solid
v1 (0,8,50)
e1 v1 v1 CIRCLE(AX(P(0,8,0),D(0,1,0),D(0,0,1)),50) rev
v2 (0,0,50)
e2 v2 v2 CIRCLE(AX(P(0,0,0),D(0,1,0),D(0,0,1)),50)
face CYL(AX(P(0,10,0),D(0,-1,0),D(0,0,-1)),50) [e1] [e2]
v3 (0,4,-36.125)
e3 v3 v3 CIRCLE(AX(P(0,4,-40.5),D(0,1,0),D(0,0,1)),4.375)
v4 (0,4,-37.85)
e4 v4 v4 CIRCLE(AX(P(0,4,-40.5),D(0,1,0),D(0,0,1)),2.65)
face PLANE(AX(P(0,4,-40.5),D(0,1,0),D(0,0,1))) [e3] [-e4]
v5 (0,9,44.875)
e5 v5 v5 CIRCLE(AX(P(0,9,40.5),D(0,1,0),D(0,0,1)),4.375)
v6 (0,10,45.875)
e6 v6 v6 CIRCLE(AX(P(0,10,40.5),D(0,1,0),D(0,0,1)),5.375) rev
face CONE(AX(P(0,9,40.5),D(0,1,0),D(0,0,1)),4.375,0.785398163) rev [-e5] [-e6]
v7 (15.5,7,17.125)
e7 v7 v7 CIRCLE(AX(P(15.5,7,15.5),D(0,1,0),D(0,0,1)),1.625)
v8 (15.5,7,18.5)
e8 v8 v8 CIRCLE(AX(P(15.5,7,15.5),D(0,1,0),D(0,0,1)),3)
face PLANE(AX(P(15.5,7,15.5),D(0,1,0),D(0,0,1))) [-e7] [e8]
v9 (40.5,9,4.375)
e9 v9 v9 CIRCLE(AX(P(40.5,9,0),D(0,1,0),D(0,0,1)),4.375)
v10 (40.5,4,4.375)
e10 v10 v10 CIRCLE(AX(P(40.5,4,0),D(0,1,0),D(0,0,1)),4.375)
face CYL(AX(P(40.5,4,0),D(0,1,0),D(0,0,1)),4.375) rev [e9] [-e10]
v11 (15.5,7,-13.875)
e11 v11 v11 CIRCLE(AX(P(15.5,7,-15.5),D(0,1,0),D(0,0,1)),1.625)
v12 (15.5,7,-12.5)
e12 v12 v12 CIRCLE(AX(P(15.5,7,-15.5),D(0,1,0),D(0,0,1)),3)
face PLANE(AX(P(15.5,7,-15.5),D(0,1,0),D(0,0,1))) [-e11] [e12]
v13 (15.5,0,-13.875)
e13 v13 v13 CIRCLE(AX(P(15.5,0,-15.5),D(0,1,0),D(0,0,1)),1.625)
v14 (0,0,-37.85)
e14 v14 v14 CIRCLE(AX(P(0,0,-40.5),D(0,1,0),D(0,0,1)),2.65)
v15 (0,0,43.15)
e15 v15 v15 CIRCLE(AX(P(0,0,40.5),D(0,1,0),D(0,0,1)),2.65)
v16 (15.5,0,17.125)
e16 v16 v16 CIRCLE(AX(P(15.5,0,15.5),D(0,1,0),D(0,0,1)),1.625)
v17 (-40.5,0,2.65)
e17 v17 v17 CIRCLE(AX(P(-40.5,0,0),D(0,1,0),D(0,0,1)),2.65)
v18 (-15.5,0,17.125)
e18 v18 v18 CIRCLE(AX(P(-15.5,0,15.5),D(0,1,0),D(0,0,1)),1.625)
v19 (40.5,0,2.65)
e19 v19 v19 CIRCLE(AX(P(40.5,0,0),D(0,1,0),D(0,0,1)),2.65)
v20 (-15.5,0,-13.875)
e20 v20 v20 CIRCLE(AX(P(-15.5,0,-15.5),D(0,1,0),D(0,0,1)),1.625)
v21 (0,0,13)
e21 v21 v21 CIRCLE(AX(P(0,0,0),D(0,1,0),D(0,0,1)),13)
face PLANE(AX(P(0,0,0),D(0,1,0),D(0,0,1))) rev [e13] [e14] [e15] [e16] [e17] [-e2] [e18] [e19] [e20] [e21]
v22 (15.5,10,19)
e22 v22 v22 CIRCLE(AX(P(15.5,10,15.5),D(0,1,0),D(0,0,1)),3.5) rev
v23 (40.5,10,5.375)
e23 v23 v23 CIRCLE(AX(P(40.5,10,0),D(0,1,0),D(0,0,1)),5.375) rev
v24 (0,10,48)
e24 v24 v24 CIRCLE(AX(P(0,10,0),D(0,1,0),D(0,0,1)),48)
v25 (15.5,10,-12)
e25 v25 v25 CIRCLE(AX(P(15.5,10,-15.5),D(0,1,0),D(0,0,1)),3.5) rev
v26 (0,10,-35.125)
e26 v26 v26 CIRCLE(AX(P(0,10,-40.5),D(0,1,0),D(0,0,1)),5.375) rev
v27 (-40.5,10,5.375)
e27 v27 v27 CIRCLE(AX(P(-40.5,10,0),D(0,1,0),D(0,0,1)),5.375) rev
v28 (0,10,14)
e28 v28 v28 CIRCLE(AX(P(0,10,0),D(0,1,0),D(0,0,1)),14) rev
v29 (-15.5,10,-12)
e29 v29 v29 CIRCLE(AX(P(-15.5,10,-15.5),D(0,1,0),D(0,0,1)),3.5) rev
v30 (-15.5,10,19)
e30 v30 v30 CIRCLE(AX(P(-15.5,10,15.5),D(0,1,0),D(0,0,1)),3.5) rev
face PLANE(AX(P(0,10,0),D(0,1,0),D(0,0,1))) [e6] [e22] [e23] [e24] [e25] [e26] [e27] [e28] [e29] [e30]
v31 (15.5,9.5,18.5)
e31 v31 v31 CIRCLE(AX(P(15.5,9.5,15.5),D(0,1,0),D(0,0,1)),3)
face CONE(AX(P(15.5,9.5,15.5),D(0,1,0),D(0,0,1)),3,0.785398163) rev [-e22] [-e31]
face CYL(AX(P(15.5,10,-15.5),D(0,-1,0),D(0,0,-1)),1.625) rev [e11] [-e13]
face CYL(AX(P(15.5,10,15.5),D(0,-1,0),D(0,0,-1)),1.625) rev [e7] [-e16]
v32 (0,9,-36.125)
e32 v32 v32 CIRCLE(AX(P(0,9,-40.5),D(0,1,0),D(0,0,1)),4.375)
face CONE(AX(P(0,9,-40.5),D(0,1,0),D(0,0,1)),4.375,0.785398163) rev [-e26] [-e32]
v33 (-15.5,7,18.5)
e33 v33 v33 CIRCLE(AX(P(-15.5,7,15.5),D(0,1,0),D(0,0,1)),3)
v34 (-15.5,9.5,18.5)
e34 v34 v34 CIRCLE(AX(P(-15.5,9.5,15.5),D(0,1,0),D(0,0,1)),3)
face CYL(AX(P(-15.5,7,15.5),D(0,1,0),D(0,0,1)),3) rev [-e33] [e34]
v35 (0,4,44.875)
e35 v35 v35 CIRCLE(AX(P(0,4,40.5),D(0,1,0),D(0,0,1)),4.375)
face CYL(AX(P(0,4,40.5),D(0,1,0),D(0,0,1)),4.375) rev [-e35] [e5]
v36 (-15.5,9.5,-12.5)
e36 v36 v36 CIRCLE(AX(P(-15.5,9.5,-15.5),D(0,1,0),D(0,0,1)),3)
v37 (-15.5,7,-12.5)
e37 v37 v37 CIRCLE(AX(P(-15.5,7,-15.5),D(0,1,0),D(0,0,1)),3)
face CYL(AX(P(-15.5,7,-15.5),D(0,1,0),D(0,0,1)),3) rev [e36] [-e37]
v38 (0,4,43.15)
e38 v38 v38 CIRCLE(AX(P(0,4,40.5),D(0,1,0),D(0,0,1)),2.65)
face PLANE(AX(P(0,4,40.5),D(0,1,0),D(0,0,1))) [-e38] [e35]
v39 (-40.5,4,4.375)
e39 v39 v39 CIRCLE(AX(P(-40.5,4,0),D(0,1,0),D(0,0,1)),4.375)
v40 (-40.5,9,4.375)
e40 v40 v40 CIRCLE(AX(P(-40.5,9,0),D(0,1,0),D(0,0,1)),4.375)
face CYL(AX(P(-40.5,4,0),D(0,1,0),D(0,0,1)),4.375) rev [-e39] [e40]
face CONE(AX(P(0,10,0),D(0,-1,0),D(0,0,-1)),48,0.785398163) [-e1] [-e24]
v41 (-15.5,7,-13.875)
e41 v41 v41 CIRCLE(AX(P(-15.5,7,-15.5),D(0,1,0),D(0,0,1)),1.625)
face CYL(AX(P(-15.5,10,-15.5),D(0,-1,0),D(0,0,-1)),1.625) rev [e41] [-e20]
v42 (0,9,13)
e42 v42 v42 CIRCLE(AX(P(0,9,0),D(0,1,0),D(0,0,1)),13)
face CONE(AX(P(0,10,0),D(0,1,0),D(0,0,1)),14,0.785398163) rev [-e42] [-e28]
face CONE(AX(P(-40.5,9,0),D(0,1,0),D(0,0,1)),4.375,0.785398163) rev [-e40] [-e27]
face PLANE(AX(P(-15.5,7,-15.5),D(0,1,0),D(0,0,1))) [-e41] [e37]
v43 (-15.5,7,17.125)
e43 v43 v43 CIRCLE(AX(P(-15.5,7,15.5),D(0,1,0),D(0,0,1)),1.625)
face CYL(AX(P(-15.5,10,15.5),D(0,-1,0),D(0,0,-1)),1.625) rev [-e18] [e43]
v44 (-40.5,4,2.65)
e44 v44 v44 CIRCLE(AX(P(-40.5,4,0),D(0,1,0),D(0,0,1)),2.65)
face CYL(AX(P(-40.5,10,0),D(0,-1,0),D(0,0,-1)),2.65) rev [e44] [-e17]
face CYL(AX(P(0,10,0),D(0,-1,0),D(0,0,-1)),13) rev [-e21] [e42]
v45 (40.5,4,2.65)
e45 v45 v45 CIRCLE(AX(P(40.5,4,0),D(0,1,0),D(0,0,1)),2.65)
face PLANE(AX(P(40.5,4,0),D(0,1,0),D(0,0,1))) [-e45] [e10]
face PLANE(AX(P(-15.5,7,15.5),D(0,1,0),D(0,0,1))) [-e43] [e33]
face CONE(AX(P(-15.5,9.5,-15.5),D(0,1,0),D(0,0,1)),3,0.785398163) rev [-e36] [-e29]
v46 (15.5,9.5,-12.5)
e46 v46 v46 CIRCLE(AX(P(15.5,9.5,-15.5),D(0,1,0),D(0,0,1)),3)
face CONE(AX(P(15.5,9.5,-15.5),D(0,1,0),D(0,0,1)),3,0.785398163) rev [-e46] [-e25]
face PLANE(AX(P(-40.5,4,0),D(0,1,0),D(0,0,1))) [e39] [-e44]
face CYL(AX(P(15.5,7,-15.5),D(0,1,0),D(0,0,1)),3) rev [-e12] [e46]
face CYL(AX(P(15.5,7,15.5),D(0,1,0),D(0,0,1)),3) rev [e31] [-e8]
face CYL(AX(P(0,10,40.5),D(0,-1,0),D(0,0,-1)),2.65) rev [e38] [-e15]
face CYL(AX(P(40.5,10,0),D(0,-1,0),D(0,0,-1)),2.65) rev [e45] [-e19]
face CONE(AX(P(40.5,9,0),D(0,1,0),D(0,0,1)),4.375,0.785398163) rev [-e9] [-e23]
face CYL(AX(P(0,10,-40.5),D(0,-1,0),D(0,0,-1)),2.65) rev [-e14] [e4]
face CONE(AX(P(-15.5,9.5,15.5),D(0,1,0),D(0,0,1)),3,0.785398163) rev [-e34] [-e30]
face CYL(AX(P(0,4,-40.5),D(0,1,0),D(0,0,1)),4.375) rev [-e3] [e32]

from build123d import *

# Parameters (mm, degrees)
SKETCH1_R           = 50
SKETCH1_R_2         = 13
SKETCH1_R_3         = 1.625
SKETCH1_R_4         = 2.65
BOSS_EXTRUDE1_DEPTH = 10
SKETCH2_R           = 3
CUT_EXTRUDE1_DEPTH  = 3
SKETCH3_R           = 4.375
CUT_EXTRUDE2_DEPTH  = 6
CHAMFER3_SIZE       = 1
CHAMFER4_SIZE       = 0.5


with BuildPart() as part:
    # Sketch1 → Boss-Extrude1 (new body)
    with BuildSketch(Plane(origin=(0, 0, 0), x_dir=(1, 0, 0), z_dir=(0, 1, 0))):
        with Locations(Location((0, 0, 0), (0, 0, 270))):
            Circle(SKETCH1_R)
        with Locations(Location((0, 0, 0), (0, 0, 270))):
            Circle(SKETCH1_R_2, mode=Mode.SUBTRACT)
        with Locations(Location((15.5, 15.5, 0), (0, 0, 270))):
            Circle(SKETCH1_R_3, mode=Mode.SUBTRACT)
        with Locations(Location((15.5, -15.5, 0), (0, 0, 270))):
            Circle(SKETCH1_R_3, mode=Mode.SUBTRACT)
        with Locations(Location((-15.5, -15.5, 0), (0, 0, 270))):
            Circle(SKETCH1_R_3, mode=Mode.SUBTRACT)
        with Locations(Location((-15.5, 15.5, 0), (0, 0, 270))):
            Circle(SKETCH1_R_3, mode=Mode.SUBTRACT)
        with Locations(Location((40.5, 0, 0), (0, 0, 270))):
            Circle(SKETCH1_R_4, mode=Mode.SUBTRACT)
        with Locations(Location((0, -40.5, 0), (0, 0, 270))):
            Circle(SKETCH1_R_4, mode=Mode.SUBTRACT)
        with Locations(Location((-40.5, 0, 0), (0, 0, 270))):
            Circle(SKETCH1_R_4, mode=Mode.SUBTRACT)
        with Locations(Location((0, 40.5, 0), (0, 0, 270))):
            Circle(SKETCH1_R_4, mode=Mode.SUBTRACT)
    extrude(amount=BOSS_EXTRUDE1_DEPTH)

    # Chamfer1: read off the stored shape, not the designer's step
    # Chamfer1 outline → Chamfer1 (revolve, cut)
    with BuildSketch(Plane.XY):
        Polygon((50, 10), (48, 10), (50, 8), align=None)
    revolve(axis=Axis((0, 0, 0), (0, 1, 0)), mode=Mode.SUBTRACT)

    # Sketch2 → Cut-Extrude1 (cut)
    with BuildSketch(Plane(origin=(0, 10, 0), x_dir=(1, 0, 0), z_dir=(0, 1, 0))):
        with Locations(Location((-15.5, 15.5, 0), (0, 0, 270))):
            Circle(SKETCH2_R)
        with Locations(Location((15.5, 15.5, 0), (0, 0, 270))):
            Circle(SKETCH2_R)
        with Locations(Location((15.5, -15.5, 0), (0, 0, 270))):
            Circle(SKETCH2_R)
        with Locations(Location((-15.5, -15.5, 0), (0, 0, 270))):
            Circle(SKETCH2_R)
    extrude(amount=-CUT_EXTRUDE1_DEPTH, mode=Mode.SUBTRACT)

    # Chamfer2: read off the stored shape, not the designer's step
    # Chamfer2 outline → Chamfer2 (revolve, cut)
    with BuildSketch(Plane.XY):
        Polygon((13, 10), (13, 9), (14, 10), align=None)
    revolve(axis=Axis((0, 0, 0), (0, 1, 0)), mode=Mode.SUBTRACT)

    # Sketch3 → Cut-Extrude2 (cut)
    with BuildSketch(Plane(origin=(0, 10, 0), x_dir=(1, 0, 0), z_dir=(0, 1, 0))):
        with Locations(Location((40.5, 0, 0), (0, 0, 270))):
            Circle(SKETCH3_R)
        with Locations(Location((0, -40.5, 0), (0, 0, 270))):
            Circle(SKETCH3_R)
        with Locations(Location((-40.5, 0, 0), (0, 0, 270))):
            Circle(SKETCH3_R)
        with Locations(Location((0, 40.5, 0), (0, 0, 270))):
            Circle(SKETCH3_R)
    extrude(amount=-CUT_EXTRUDE2_DEPTH, mode=Mode.SUBTRACT)

    # Chamfer3
    chamfer3_edges = [part.edges().sort_by_distance(p)[0] for p in [
        (40.5, 10, -4.375),
        (0, 10, 36.125),
        (-40.5, 10, -4.375),
        (0, 10, -44.875),
    ]]
    chamfer(chamfer3_edges, length=CHAMFER3_SIZE)

    # Chamfer4
    chamfer4_edges = [part.edges().sort_by_distance(p)[0] for p in [
        (-15.5, 10, 12.5),
        (15.5, 10, 12.5),
        (15.5, 10, -18.5),
        (-15.5, 10, -18.5),
    ]]
    chamfer(chamfer4_edges, length=CHAMFER4_SIZE)


solid = part.part
